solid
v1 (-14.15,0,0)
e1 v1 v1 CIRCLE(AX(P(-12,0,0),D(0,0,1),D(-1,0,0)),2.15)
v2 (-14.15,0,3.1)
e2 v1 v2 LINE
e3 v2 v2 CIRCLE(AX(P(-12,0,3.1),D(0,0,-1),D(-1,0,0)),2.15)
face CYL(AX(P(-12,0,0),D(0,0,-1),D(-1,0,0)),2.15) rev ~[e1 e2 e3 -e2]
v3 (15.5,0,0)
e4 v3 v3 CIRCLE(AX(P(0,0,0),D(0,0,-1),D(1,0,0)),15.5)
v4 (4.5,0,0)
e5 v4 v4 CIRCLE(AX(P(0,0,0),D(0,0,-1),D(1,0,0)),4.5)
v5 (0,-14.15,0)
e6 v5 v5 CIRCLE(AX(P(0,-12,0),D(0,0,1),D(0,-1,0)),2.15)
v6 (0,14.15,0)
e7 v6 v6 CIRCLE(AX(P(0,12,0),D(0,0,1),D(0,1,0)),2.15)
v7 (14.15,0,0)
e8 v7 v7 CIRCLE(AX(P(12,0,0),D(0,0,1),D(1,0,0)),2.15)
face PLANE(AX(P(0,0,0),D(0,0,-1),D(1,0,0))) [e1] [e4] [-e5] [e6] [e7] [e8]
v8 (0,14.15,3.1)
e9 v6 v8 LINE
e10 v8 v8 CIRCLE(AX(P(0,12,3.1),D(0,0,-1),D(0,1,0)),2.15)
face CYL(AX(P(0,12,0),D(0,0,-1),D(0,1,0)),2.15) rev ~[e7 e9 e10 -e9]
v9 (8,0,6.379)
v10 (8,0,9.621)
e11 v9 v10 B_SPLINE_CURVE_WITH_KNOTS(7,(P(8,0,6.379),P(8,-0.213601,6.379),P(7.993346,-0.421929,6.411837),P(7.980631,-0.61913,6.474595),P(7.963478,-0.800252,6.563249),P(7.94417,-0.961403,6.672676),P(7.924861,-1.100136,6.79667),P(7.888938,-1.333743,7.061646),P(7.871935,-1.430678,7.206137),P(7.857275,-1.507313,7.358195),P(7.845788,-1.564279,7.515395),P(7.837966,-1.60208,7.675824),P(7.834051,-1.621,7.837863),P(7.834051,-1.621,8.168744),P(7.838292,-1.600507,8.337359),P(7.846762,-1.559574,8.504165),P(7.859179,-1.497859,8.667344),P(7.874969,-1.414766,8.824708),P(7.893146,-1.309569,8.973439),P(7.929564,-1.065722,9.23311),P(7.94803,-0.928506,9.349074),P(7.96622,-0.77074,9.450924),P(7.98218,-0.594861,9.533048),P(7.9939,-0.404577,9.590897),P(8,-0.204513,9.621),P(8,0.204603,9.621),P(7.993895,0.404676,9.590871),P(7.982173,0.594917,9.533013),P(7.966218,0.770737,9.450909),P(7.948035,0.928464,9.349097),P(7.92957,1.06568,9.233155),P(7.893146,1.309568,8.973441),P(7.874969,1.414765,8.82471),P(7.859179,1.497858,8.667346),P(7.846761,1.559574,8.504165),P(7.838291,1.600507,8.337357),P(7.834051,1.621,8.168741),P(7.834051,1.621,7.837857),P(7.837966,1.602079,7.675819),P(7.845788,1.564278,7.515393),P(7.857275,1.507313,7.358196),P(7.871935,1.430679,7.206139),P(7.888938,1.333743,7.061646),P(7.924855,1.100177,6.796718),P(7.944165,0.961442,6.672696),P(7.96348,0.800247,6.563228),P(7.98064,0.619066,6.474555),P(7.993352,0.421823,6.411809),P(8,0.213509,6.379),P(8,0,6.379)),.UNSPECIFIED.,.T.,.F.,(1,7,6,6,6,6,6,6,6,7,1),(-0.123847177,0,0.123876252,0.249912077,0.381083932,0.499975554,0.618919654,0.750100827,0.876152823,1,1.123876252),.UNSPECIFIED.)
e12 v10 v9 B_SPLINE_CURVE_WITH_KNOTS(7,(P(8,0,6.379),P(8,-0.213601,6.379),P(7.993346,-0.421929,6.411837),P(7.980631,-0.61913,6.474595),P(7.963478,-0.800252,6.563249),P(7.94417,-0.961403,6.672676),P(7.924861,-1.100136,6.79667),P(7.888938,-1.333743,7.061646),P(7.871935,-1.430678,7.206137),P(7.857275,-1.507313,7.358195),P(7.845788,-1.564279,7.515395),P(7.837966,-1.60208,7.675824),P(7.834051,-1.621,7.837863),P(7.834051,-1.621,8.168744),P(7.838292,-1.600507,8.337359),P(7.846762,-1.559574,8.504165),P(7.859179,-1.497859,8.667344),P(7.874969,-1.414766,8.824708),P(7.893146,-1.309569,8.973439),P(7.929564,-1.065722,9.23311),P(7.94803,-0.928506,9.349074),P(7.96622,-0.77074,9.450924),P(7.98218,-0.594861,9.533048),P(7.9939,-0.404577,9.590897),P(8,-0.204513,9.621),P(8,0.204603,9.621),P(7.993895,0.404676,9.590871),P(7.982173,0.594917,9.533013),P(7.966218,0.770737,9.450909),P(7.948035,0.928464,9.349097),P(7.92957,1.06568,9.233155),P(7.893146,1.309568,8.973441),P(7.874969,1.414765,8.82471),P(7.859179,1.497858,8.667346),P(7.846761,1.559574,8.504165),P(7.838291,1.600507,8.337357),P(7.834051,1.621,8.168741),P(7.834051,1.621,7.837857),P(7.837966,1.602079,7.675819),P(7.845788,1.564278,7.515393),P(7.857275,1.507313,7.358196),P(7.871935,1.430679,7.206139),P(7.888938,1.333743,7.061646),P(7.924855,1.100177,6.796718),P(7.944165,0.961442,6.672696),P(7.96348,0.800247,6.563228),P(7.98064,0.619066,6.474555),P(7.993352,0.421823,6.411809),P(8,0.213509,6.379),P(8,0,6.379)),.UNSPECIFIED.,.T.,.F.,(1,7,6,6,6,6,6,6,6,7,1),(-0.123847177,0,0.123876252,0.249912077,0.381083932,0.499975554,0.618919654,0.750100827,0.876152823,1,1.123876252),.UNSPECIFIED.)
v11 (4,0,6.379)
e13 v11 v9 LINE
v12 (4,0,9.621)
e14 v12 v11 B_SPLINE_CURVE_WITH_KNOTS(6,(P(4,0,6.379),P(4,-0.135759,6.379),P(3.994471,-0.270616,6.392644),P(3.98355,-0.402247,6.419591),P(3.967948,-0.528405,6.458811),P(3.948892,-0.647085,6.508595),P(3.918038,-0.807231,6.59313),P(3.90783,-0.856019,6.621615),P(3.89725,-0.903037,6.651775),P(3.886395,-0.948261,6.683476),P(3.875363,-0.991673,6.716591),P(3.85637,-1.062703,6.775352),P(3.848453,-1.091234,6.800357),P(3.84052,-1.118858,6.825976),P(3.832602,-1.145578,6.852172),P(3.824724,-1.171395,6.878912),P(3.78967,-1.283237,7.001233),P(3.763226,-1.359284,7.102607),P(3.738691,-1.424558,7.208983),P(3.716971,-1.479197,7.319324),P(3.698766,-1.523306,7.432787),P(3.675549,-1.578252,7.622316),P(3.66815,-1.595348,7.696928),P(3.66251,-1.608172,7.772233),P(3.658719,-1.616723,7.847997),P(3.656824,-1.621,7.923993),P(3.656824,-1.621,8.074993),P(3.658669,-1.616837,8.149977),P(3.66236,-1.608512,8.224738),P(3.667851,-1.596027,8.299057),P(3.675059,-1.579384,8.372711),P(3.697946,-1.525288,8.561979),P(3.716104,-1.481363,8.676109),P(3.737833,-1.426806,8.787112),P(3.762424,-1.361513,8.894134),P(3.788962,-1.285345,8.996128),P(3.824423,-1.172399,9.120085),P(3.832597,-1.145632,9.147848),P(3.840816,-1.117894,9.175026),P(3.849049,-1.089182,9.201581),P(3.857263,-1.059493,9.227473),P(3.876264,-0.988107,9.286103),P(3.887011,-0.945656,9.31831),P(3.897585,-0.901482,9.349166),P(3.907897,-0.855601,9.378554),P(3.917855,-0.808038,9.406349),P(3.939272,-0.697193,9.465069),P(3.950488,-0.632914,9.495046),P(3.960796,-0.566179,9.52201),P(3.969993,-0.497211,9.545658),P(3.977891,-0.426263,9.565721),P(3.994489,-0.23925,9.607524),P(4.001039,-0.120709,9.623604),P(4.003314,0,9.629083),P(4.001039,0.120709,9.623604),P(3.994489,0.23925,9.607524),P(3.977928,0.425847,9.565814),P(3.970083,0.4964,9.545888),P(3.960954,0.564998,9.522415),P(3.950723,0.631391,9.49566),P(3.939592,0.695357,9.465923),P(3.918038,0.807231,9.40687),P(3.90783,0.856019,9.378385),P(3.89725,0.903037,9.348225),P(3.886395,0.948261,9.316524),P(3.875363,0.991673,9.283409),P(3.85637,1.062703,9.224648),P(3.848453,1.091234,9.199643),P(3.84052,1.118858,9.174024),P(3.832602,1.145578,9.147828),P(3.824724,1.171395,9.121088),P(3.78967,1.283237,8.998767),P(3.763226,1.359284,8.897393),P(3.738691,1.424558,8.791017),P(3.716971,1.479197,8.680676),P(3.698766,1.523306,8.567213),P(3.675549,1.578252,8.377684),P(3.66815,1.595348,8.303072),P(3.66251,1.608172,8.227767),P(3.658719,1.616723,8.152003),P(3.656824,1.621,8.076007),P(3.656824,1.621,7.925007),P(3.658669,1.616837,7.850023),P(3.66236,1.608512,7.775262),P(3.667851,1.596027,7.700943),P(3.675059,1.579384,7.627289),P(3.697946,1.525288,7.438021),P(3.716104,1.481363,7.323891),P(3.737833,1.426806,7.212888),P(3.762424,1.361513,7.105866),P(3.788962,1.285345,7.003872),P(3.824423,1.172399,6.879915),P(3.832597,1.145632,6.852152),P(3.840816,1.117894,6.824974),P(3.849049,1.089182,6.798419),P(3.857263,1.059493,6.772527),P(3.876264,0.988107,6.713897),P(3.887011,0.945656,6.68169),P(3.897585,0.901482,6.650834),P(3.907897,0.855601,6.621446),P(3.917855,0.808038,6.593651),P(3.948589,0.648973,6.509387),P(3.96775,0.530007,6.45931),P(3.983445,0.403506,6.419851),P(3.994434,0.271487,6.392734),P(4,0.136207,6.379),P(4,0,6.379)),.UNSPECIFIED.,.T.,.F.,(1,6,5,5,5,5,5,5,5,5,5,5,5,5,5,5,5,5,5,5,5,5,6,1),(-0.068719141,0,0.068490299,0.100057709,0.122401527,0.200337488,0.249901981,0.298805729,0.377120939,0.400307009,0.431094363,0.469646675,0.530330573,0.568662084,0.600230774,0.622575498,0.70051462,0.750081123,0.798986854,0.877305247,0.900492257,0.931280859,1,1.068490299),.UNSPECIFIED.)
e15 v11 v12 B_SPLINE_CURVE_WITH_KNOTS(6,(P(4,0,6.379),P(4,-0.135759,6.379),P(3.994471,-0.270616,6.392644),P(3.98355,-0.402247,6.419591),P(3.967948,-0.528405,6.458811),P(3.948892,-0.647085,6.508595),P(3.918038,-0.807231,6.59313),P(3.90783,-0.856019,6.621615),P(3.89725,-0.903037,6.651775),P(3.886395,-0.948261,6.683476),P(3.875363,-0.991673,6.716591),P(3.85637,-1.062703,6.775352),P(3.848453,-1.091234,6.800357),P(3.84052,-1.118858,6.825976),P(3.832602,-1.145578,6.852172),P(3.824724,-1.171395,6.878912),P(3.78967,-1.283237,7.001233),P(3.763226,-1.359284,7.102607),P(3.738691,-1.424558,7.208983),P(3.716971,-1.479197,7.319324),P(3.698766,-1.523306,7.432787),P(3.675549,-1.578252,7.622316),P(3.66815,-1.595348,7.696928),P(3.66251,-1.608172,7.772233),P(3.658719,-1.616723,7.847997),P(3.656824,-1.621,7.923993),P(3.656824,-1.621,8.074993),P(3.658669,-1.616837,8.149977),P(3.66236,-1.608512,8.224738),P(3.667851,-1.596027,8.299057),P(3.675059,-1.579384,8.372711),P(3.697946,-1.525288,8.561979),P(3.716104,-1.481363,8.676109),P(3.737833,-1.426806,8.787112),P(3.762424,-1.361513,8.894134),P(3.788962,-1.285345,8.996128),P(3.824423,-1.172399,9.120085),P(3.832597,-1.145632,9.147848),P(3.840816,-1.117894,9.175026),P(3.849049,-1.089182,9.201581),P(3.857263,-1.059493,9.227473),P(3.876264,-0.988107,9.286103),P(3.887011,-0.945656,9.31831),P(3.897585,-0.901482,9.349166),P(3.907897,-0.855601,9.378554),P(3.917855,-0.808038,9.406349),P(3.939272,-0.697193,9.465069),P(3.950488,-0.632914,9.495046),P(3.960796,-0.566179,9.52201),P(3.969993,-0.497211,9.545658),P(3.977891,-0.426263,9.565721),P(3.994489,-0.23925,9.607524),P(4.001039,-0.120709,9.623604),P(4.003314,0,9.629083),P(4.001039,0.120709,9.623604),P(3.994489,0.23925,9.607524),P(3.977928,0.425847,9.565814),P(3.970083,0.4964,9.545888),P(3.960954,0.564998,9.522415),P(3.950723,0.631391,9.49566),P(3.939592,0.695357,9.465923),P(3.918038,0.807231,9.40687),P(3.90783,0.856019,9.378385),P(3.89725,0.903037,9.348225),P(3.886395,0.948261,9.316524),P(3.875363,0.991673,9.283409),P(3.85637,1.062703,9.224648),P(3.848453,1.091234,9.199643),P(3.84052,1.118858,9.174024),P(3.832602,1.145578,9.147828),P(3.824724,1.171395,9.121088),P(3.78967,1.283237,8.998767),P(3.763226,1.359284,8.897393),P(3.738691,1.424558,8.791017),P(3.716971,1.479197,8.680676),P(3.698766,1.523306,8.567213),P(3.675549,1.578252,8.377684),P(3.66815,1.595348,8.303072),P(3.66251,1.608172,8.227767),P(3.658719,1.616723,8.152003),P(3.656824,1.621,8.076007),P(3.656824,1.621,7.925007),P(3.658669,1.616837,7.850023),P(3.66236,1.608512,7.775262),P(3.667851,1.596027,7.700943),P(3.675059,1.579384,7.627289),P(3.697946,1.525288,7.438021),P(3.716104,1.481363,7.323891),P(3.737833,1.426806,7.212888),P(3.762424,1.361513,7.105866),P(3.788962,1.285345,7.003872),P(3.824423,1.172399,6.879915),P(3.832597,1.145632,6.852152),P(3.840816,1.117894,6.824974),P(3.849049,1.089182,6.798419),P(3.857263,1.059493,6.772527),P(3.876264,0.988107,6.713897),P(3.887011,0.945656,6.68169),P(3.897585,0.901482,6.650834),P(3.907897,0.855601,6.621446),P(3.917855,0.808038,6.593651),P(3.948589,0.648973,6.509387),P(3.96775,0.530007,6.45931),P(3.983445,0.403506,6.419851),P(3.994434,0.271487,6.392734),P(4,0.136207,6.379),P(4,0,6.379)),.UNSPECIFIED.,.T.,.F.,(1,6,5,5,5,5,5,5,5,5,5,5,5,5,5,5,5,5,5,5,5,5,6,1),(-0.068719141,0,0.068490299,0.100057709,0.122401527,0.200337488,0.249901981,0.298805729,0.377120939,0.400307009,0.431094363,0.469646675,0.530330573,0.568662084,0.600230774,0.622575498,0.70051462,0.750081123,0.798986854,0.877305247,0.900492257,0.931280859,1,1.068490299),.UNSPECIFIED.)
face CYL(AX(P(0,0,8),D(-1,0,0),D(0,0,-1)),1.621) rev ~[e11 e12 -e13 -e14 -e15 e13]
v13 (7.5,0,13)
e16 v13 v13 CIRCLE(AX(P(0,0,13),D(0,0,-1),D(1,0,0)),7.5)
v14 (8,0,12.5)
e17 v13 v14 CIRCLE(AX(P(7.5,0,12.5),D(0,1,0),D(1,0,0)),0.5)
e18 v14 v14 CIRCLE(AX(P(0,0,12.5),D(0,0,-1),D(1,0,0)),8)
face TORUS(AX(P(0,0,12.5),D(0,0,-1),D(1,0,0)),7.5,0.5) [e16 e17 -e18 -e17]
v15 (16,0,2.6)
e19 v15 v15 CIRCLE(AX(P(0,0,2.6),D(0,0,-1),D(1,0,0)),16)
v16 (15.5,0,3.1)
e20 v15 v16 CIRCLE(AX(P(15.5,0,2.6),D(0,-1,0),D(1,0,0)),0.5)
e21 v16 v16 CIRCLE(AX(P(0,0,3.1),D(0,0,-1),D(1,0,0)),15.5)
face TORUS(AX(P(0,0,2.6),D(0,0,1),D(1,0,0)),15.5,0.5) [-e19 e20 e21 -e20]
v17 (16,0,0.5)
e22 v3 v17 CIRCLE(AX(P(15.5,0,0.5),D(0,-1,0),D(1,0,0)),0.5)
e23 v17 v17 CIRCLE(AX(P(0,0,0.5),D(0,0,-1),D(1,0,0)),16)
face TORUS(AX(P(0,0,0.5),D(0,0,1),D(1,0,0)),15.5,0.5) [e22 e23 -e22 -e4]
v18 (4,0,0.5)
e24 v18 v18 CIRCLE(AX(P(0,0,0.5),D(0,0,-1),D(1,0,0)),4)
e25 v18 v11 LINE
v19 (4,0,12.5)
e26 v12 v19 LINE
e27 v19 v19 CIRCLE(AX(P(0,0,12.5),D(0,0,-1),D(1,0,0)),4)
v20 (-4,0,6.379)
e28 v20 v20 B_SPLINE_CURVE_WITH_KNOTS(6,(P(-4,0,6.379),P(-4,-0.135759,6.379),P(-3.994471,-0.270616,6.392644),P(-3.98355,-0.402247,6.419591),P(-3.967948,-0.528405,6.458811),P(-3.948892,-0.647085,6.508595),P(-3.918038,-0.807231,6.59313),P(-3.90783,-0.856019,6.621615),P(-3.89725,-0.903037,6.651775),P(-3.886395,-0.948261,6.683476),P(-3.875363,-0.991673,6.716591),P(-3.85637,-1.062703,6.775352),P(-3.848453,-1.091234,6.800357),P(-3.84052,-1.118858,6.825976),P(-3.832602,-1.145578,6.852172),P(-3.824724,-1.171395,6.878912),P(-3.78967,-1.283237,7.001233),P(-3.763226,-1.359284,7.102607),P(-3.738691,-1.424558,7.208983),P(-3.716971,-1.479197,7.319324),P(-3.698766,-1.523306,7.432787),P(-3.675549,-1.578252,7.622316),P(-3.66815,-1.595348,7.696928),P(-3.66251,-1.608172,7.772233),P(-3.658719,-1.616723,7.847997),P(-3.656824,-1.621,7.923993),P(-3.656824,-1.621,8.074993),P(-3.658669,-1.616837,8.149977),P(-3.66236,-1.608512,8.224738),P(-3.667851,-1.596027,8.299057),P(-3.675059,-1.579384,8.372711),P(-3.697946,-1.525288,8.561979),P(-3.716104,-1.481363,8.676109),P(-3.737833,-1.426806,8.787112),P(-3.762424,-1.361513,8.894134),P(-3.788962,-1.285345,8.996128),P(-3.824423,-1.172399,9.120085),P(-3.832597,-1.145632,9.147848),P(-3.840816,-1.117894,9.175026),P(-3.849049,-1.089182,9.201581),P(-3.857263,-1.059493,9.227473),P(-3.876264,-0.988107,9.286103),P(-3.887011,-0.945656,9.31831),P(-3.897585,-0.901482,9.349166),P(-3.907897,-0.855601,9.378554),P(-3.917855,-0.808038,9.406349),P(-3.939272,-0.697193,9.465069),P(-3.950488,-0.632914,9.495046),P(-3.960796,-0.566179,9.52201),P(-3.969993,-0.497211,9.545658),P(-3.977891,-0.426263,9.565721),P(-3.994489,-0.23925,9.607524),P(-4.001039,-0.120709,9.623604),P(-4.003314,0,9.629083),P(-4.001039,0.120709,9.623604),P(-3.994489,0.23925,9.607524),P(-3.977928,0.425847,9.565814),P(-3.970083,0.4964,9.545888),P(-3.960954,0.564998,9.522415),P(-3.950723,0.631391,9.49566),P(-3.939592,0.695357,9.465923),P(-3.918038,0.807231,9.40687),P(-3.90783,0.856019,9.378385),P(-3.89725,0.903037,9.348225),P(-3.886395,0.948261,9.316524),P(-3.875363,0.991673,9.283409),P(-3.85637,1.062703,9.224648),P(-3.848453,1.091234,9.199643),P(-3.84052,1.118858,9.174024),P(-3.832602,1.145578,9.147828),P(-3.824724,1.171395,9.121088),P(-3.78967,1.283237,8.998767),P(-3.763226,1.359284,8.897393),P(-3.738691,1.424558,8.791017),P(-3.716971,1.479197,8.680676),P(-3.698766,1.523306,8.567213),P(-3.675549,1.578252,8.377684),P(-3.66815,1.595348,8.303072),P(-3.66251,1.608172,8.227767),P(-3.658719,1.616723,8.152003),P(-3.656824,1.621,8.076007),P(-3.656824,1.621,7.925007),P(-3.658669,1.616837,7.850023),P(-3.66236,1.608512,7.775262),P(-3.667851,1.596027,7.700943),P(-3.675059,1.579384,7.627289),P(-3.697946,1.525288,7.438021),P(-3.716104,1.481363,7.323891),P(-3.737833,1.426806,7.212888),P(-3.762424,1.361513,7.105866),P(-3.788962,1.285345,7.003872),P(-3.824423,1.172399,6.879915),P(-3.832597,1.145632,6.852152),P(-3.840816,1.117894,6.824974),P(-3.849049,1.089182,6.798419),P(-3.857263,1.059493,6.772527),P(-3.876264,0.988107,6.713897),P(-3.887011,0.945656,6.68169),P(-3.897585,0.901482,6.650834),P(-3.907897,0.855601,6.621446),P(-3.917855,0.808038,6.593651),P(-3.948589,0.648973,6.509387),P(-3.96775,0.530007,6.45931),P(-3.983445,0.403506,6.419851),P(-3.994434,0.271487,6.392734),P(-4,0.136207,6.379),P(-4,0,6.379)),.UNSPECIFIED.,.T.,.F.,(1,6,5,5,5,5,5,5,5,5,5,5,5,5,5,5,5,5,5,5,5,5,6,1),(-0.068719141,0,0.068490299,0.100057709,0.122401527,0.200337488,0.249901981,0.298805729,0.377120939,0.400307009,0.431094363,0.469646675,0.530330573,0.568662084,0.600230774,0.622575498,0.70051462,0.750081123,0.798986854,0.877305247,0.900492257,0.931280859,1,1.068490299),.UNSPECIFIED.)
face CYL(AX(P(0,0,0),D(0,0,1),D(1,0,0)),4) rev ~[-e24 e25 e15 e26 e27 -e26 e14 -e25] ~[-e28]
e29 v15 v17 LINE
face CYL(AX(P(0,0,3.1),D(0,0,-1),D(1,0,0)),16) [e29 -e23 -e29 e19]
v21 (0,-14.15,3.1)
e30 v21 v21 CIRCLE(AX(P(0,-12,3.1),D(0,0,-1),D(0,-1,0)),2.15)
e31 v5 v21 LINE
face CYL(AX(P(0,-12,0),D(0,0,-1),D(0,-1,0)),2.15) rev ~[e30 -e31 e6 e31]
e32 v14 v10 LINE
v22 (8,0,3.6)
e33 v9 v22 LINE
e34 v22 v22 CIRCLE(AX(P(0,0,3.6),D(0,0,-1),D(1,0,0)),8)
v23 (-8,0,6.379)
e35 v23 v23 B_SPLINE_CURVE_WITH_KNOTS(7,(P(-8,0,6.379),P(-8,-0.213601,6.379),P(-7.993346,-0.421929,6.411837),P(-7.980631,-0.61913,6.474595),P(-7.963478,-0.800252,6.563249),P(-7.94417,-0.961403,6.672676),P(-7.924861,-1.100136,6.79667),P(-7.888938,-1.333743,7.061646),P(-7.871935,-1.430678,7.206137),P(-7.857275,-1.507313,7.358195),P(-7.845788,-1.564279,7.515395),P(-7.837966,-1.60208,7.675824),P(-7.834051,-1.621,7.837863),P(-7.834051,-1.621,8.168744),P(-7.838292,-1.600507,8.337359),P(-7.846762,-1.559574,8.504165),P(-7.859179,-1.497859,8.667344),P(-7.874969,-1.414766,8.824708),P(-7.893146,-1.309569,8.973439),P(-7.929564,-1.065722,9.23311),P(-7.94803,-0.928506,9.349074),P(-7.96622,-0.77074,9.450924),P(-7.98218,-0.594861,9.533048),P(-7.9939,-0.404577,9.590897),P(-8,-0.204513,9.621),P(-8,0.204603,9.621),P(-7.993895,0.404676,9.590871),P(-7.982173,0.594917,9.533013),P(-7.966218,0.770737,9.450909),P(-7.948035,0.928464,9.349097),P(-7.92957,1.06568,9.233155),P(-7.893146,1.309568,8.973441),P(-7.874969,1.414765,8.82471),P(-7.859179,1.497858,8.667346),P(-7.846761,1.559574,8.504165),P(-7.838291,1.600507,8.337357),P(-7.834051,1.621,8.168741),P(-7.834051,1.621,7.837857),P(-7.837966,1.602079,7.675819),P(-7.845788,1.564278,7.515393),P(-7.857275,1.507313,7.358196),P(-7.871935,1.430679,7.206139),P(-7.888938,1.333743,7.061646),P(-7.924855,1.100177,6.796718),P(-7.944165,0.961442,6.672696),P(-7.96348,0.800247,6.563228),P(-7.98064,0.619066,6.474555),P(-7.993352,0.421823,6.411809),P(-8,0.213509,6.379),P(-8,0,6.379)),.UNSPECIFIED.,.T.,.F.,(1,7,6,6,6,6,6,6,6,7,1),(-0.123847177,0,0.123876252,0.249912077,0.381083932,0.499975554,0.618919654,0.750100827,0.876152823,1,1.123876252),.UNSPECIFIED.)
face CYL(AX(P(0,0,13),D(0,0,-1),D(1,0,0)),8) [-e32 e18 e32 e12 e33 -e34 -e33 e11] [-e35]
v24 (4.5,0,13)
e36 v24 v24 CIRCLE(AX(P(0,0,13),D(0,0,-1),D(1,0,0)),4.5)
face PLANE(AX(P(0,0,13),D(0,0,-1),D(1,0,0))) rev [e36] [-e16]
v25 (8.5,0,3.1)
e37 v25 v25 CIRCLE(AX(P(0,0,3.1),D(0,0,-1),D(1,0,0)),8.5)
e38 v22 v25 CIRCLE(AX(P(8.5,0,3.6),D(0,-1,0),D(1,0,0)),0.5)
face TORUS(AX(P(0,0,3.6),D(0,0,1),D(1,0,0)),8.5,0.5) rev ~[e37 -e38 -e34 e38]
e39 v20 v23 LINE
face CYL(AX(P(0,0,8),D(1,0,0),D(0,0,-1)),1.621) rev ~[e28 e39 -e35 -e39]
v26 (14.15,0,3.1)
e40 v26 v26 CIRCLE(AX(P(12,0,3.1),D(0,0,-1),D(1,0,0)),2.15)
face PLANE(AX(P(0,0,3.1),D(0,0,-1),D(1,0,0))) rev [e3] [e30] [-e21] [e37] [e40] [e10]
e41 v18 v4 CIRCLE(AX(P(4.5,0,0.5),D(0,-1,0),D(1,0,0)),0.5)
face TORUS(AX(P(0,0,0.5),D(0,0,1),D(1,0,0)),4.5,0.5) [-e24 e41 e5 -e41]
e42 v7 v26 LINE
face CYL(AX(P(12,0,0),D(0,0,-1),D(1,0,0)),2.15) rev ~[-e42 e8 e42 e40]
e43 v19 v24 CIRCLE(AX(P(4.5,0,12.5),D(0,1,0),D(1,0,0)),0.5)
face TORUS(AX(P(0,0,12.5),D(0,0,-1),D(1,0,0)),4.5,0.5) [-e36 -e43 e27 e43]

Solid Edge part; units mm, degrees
sketch "Sketch1" plane through (0, 0, 0) normal (0, -1, 0) x (1, 0, 0)
  line L0 (4, 0) -> (4, 13)
  line L1 (4, 13) -> (8, 13)
  line L2 (8, 13) -> (8, 3.1)
  line L3 (8, 3.1) -> (16, 3.1)
  line L4 (16, 3.1) -> (16, 0)
  line L5 (16, 0) -> (4, 0)
  dimension "D1" = 3.1
  dimension "D2" = 13
revolve "RevolvedProtrusion1" add sketch "Sketch1" angle 360 about axis through (0, 0, 54) along (0, 0, -1)
hole "mounting_hole" at (0, 12, 0) direction (0, 0, 1) diameter 4.3 end up to next
pattern_circular "Pattern1" count 4 over 360 about axis through (0, 0, 3.1) along (0, 0, 1) of "mounting_hole"
fillet "Round1" radius 0.5 6 edges at (-8, 0, 13) (-4, 0, 13) (-8, 0, 3.1) (-16, 0, 3.1) (-16, 0, 0) (-4, 0, 0)
hole "worm_screw_hole" at (0, 0, 8) direction (-1, 0, 0) diameter 3.242 end up to next
mirror "Mirror1" about plane through (0, 0, 0) normal (1, 0, 0) of "worm_screw_hole"
properties part number "A2.N1" material "X5CrNi18-8"
